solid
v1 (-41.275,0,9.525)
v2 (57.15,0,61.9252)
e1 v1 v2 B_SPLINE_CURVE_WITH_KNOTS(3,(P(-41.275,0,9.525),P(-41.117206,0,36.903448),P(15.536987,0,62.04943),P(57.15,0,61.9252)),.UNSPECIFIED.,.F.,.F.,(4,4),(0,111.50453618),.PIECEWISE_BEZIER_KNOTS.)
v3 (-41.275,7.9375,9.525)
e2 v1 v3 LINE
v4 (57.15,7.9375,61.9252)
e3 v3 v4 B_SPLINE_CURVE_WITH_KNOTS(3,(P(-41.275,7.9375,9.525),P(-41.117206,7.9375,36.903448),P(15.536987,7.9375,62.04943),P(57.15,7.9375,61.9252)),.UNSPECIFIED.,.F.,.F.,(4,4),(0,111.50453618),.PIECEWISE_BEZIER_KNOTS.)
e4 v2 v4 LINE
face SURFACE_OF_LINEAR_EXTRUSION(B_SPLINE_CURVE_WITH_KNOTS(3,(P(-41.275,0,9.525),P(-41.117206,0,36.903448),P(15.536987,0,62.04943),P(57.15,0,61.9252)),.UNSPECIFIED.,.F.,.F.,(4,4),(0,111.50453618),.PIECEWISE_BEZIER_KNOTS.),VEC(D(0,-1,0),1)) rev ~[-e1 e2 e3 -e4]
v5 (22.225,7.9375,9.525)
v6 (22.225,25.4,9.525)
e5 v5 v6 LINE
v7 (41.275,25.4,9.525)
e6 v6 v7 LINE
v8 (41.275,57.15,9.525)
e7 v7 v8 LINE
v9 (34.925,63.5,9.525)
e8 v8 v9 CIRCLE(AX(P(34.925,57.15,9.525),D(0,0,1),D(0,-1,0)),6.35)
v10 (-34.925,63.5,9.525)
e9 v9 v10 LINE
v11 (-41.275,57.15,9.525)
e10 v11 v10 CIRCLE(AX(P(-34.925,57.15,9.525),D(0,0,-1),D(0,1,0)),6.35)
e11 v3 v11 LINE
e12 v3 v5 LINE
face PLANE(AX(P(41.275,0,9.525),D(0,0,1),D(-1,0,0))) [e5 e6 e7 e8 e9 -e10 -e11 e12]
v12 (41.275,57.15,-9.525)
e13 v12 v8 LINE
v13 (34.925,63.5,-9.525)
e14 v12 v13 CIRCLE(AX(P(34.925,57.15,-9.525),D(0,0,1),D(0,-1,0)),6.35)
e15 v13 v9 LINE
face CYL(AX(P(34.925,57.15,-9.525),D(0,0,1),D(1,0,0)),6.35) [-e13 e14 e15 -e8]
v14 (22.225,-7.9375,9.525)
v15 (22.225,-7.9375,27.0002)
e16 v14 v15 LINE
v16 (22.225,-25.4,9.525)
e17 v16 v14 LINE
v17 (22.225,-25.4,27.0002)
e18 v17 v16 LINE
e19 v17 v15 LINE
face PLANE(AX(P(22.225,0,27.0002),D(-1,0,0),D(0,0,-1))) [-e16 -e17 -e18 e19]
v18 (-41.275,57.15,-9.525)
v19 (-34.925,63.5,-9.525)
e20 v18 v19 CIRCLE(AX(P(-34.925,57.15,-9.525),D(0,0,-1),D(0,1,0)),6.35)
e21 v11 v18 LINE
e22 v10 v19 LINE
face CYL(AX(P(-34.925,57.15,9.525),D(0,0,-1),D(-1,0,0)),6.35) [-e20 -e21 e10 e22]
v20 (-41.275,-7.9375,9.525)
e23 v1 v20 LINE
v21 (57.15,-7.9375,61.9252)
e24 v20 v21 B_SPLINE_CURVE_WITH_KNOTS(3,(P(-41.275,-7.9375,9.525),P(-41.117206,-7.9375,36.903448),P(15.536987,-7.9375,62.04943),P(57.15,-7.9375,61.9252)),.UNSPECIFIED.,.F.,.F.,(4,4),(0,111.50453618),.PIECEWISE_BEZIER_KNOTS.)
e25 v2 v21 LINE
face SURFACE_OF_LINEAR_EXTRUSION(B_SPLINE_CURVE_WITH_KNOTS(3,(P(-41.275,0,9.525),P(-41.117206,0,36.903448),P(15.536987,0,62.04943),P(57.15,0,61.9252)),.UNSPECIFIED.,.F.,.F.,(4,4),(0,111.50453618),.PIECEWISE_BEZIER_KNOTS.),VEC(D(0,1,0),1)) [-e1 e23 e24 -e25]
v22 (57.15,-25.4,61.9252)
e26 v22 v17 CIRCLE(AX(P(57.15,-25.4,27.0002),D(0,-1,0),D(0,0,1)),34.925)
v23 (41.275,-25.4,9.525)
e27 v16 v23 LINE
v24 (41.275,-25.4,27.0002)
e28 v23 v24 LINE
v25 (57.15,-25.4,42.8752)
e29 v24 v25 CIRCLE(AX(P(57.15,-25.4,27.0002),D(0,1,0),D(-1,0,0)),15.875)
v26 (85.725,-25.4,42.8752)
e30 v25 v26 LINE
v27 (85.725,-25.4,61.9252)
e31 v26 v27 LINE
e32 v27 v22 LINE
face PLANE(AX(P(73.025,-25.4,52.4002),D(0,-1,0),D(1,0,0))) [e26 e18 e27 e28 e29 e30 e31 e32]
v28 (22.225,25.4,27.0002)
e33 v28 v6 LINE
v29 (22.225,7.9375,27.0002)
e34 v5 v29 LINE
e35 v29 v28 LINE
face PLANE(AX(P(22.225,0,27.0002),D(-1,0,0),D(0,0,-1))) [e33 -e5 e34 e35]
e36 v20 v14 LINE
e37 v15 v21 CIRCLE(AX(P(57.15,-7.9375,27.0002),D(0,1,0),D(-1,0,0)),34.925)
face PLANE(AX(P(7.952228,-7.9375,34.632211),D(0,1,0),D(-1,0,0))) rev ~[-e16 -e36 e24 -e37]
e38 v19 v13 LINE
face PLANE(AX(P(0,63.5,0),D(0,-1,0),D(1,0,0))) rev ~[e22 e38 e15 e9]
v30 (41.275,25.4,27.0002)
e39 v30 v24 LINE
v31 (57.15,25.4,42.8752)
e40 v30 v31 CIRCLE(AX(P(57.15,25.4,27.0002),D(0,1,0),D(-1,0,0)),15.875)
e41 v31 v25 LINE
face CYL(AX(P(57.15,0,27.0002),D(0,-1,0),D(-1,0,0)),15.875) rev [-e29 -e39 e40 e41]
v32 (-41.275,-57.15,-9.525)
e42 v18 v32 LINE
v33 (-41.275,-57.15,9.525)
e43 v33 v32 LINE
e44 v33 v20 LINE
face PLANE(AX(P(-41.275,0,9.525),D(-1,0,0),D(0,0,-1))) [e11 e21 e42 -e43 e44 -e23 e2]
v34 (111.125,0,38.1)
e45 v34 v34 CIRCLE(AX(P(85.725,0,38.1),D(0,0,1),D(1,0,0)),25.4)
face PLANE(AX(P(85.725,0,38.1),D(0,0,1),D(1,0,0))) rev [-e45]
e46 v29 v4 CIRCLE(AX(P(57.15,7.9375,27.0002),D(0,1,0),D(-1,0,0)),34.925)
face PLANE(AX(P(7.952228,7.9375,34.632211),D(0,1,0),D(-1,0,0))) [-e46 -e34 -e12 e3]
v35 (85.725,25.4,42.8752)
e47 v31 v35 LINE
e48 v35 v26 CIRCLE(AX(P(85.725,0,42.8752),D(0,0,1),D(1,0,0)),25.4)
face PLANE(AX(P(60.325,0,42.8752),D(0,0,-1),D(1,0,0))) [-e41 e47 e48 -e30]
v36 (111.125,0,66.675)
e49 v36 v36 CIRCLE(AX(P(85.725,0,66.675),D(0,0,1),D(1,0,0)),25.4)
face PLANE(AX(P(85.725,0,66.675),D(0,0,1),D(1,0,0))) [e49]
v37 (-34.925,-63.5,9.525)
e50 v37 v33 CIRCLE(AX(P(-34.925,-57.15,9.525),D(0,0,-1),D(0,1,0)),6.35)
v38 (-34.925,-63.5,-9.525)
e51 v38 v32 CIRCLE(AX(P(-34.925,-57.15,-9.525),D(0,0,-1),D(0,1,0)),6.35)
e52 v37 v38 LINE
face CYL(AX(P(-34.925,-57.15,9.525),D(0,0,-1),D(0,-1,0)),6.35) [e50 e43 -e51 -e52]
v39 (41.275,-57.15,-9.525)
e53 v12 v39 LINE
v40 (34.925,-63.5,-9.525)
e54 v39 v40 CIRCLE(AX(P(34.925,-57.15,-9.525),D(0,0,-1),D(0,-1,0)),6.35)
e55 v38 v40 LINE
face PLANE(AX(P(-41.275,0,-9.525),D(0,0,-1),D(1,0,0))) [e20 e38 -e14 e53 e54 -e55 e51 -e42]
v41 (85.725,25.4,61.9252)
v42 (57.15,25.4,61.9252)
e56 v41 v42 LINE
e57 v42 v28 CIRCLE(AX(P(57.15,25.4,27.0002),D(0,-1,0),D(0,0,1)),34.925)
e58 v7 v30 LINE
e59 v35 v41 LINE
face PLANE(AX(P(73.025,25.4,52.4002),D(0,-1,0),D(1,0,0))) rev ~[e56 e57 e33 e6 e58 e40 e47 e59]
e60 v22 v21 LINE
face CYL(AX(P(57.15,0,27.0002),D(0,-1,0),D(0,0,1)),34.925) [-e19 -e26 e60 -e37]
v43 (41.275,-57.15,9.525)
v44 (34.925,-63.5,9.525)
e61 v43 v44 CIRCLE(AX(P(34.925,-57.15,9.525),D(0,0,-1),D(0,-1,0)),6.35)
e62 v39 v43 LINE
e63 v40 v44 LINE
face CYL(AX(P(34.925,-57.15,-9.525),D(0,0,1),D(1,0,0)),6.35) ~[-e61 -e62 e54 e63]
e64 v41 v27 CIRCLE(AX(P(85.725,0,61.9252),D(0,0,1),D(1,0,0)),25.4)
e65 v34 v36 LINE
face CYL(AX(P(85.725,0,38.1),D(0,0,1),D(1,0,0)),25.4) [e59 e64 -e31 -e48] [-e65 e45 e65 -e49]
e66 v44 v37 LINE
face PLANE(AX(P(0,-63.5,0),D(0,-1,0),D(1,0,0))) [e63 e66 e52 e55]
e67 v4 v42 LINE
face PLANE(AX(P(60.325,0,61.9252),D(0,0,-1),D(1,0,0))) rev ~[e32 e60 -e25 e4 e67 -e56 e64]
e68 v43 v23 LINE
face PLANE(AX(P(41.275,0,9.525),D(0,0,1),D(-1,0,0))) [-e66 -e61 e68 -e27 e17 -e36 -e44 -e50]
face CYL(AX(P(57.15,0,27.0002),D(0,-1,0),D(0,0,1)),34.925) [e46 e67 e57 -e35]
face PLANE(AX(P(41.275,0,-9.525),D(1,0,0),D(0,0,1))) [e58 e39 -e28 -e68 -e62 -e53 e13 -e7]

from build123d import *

# Parameters (mm, degrees)
F1_DEPTH = 63.5
F2_DEPTH = 25.4
F3_DEPTH = 7.9375
F0_W     = 25.4
F0_H     = 19.0500000358
F4_DEPTH = 25.4
F6_R     = 6.35


# Not quite as in the source:
# - a feature names something its author has since deleted; it is built from what else it names


with BuildPart() as f1:
    # F0 (on Front) → F1 (new body, symmetric)
    with BuildSketch(Plane.XZ):
        Polygon((-41.275, 9.525), (-41.275, -9.525), (41.275, -9.525), (41.275, 9.525), (22.2249999642, 9.525), align=None)
    extrude(amount=F1_DEPTH, both=True)

    # F0 (on Front) → F2 (join, symmetric)
    with BuildSketch(Plane.XZ):
        with BuildLine():
            Line((22.2249999642, 9.525), (41.275, 9.525))
            Line((41.275, 9.525), (41.275, 27.0002))
            ThreePointArc((41.275, 27.0002), (45.9246798487, 38.2255201513), (57.15, 42.8752))
            Line((57.15, 42.8752), (60.325, 42.8752))
            Line((60.325, 42.8752), (60.325, 61.9252000358))
            Line((60.325, 61.9252000358), (57.15, 61.9252000358))
            ThreePointArc((57.15, 61.9252000358), (32.4542956418, 51.6959043582), (22.2249999642, 27.0002))
            Line((22.2249999642, 27.0002), (22.2249999642, 9.525))
        make_face()
    extrude(amount=F2_DEPTH, both=True)

    # F0 (on Front) → F3 (join, symmetric)
    with BuildSketch(Plane.XZ):
        with BuildLine():
            add(Edge.make_bspline(
                [(-41.275, 9.525), (-41.1172062159, 36.9034484029), (15.5369872227, 62.0494298637), (57.15, 61.9252000358)],
                knots=[0, 0, 0, 0, 111.5045361803, 111.5045361803, 111.5045361803, 111.5045361803], degree=3))
            Line((-41.275, 9.525), (22.2249999642, 9.525))
            Line((22.2249999642, 9.525), (22.2249999642, 27.0002))
            ThreePointArc((22.2249999642, 27.0002), (32.4542956418, 51.6959043582), (57.15, 61.9252000358))
        make_face()
    extrude(amount=F3_DEPTH, both=True)

    # F0 (on Front) → F4 (join, symmetric)
    with BuildSketch(Plane.XZ):
        with Locations((73.025, 52.4002000179)):
            Rectangle(F0_W, F0_H)
    extrude(amount=F4_DEPTH, both=True)

    # F0 (on Front) → F5 (revolve)
    with BuildSketch(Plane.XZ):
        Polygon((85.725, 66.675), (85.725, 61.9252000358), (85.725, 42.8752), (85.725, 38.1), (111.125, 38.1), (111.125, 66.675), align=None)
    revolve(axis=Axis((85.725, 0, 52.3875), (0, 0, 1)))

    # F6
    f6_edges = [f1.edges().sort_by_distance(p)[0] for p in [
        (41.275, -63.5, 0),
        (-41.275, -63.5, 0),
        (41.275, 63.5, 0),
        (-41.275, 63.5, 0),
    ]]
    fillet(f6_edges, radius=F6_R)


solid = f1.part
